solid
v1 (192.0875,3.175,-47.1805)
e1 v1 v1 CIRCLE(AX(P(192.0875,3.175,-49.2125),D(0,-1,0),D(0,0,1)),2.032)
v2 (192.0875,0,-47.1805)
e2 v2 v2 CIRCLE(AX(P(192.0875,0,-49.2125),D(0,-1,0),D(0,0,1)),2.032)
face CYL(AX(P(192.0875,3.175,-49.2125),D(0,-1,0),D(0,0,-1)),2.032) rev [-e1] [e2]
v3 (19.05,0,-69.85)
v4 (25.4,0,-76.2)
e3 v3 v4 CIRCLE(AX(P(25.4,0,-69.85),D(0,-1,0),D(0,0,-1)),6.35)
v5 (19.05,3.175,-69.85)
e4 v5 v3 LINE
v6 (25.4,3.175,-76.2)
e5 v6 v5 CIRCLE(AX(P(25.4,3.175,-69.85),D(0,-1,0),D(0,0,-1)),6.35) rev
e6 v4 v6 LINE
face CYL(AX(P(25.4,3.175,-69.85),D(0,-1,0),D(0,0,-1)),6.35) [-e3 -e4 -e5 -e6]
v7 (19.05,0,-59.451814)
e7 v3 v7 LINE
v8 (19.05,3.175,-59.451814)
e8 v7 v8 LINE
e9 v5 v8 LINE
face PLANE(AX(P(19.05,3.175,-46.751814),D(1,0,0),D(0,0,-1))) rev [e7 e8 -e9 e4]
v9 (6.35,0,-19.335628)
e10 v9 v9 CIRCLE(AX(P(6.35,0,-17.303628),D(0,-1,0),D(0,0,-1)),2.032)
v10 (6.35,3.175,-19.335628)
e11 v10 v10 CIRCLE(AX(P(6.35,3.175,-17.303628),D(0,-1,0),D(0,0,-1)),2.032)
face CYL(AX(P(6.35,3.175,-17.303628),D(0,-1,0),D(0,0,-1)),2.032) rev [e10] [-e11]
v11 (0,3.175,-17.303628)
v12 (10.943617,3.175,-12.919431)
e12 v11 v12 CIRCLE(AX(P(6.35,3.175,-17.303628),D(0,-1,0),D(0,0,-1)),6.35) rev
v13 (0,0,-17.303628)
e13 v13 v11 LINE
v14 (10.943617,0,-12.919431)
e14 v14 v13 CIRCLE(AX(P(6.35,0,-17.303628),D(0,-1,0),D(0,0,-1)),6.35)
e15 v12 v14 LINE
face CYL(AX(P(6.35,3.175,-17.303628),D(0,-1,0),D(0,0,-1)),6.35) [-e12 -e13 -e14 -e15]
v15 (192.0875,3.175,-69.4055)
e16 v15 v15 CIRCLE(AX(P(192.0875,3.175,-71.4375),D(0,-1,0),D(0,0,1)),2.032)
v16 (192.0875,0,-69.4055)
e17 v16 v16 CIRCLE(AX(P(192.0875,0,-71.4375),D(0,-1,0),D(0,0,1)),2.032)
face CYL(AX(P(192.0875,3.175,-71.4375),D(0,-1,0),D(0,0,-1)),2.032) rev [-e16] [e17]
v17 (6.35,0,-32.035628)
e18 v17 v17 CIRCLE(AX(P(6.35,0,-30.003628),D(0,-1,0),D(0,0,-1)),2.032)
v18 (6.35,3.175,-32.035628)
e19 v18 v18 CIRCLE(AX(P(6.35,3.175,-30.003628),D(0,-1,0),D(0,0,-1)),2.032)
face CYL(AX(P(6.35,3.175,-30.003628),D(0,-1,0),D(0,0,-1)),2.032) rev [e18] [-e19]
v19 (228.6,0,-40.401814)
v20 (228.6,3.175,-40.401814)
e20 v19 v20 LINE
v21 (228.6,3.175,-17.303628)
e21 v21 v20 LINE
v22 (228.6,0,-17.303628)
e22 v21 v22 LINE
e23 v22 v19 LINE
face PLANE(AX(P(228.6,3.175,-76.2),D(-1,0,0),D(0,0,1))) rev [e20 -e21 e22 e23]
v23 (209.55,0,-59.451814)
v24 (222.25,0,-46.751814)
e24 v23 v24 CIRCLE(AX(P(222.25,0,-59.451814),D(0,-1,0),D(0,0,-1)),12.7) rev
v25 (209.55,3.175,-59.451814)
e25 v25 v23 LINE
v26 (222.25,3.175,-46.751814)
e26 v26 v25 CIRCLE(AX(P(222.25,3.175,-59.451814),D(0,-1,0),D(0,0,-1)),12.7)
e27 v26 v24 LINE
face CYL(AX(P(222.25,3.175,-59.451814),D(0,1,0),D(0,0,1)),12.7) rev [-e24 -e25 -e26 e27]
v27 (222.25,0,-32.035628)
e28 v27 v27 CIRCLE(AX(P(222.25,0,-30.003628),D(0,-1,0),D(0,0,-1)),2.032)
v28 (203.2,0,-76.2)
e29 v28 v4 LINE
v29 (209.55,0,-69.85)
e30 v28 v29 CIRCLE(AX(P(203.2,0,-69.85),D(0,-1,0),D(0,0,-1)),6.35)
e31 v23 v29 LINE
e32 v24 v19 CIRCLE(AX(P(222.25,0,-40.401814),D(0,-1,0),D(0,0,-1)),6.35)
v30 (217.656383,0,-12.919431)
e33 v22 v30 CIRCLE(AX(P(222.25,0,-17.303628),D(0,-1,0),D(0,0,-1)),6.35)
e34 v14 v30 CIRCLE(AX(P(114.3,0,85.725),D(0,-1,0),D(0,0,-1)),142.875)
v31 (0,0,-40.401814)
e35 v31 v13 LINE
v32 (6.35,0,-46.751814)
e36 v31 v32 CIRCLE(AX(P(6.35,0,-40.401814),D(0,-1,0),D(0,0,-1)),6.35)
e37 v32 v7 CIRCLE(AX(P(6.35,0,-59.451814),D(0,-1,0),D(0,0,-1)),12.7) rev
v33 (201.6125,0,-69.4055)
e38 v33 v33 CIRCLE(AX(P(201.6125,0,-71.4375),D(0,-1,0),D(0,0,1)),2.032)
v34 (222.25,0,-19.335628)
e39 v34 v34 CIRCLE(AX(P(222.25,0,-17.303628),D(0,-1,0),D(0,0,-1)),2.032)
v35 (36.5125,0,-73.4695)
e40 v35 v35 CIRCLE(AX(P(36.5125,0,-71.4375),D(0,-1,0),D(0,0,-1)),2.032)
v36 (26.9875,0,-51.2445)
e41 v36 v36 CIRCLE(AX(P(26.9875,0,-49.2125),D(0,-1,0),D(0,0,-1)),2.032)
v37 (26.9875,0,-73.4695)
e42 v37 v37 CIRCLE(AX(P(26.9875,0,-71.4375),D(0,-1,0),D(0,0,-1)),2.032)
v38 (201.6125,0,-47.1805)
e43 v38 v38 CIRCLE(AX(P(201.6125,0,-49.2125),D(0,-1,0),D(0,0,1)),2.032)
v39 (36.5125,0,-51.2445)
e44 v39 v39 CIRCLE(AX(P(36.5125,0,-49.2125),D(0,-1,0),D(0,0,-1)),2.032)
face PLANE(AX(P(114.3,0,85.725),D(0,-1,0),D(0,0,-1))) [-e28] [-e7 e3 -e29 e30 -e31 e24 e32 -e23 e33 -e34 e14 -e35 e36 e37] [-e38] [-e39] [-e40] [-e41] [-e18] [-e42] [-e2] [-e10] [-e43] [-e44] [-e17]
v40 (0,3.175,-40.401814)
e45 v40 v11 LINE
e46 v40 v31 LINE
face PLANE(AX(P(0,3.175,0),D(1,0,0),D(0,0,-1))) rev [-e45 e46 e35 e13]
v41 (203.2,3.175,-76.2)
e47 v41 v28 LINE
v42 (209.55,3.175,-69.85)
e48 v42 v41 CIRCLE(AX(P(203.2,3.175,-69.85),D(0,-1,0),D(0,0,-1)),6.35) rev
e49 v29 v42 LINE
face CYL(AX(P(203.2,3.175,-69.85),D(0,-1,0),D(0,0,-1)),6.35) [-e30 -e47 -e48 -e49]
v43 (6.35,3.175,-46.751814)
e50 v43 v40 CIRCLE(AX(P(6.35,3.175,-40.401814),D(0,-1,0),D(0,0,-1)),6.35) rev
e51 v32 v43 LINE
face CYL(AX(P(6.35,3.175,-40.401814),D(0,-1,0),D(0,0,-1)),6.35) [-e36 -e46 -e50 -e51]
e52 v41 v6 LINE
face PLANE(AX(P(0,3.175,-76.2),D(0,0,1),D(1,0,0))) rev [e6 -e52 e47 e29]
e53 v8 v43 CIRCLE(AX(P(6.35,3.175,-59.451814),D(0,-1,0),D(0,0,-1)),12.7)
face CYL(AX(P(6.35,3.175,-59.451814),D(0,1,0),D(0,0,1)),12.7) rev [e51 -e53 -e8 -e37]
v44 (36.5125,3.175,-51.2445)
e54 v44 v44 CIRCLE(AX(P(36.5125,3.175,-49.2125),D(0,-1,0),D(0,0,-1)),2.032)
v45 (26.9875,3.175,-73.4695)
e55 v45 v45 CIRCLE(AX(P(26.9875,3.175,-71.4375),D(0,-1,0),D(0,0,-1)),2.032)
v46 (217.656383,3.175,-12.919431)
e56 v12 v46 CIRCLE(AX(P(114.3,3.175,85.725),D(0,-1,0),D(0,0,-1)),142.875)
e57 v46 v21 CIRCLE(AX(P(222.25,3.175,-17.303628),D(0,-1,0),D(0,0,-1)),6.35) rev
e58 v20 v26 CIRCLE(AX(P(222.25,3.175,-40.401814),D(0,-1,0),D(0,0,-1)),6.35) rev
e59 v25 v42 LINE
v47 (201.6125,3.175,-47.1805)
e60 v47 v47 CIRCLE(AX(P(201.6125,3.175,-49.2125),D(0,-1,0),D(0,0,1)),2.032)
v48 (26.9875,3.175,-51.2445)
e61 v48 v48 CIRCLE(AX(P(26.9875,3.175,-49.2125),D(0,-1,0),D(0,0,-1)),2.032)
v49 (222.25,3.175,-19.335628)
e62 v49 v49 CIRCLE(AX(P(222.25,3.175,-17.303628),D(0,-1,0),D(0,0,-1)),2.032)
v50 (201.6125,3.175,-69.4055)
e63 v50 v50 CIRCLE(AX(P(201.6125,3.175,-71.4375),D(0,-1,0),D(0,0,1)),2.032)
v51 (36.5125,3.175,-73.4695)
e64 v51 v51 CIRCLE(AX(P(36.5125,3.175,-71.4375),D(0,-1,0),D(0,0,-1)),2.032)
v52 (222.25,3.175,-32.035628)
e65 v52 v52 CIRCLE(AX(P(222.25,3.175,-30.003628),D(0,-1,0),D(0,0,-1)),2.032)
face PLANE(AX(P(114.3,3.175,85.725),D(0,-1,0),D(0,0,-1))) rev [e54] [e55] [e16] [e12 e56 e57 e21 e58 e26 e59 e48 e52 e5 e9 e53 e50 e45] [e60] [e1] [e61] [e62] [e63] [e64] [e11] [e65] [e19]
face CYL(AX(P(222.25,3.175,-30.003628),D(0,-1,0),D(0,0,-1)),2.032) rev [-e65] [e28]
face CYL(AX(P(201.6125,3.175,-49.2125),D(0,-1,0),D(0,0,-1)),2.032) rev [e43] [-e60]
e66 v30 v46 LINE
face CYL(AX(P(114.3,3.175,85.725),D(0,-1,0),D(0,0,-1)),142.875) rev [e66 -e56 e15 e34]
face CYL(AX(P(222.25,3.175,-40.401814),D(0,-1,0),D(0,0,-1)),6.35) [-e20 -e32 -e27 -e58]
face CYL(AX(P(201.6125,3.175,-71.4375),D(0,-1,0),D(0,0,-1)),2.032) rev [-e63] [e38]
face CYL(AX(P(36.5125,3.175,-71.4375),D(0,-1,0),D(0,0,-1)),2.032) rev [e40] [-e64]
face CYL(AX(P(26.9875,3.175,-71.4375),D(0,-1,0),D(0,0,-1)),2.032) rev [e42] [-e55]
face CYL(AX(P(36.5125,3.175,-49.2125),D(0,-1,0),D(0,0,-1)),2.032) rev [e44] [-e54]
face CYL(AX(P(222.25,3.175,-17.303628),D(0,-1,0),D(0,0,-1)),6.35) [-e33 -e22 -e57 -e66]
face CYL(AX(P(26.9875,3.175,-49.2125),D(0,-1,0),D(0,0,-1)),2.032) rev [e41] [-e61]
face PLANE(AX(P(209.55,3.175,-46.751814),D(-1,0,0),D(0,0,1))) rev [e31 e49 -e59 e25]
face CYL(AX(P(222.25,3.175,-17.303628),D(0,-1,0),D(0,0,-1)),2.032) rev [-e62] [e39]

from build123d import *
from OCP.BRepFilletAPI import BRepFilletAPI_MakeFillet

# Parameters (mm, degrees)
BOSS_EXTRUDE1_DEPTH = 3.175
SKETCH3_R           = 2.032
CUT_EXTRUDE1_DEPTH  = 241.986473946
FILLET1_R           = 6.35
SKETCH4_R           = 2.032
SKETCH4_W           = 19.05
SKETCH4_H           = 29.448186152
CUT_EXTRUDE2_DEPTH  = 241.986473946
FILLET2_R           = 12.7
FILLET2_R_2         = 6.35


with BuildPart() as part:
    # Sketch1 → Boss-Extrude1 (new body)
    with BuildSketch(Plane(origin=(0, 0, 0), x_dir=(1, 0, 0), z_dir=(0, 1, 0))):
        with BuildLine():
            Line((0, 0), (0, 76.2))
            Line((0, 76.2), (228.6, 76.2))
            Line((228.6, 76.2), (228.6, 0))
            ThreePointArc((228.6, 0), (114.3, 57.15), (0, 0))
        make_face()
    extrude(amount=BOSS_EXTRUDE1_DEPTH)

    # Sketch3 → Cut-Extrude1 (cut, through all)
    with BuildSketch(Plane.XZ):
        with Locations(Location((36.5125, -49.2125, 0), (0, 0, 270))):
            Circle(SKETCH3_R)
        with Locations(Location((26.9875, -49.2125, 0), (0, 0, 270))):
            Circle(SKETCH3_R)
        with Locations(Location((201.6125, -49.2125, 0), (0, 0, 90))):
            Circle(SKETCH3_R)
        with Locations(Location((192.0875, -49.2125, 0), (0, 0, 90))):
            Circle(SKETCH3_R)
        with Locations(Location((36.5125, -71.4375, 0), (0, 0, 270))):
            Circle(SKETCH3_R)
        with Locations(Location((26.9875, -71.4375, 0), (0, 0, 270))):
            Circle(SKETCH3_R)
        with Locations(Location((201.6125, -71.4375, 0), (0, 0, 90))):
            Circle(SKETCH3_R)
        with Locations(Location((192.0875, -71.4375, 0), (0, 0, 90))):
            Circle(SKETCH3_R)
    extrude(amount=-CUT_EXTRUDE1_DEPTH, mode=Mode.SUBTRACT)

    # Fillet1
    fillet1_edges = [part.edges().sort_by_distance(p)[0] for p in [
        (0, 1.5875, 0),
        (228.6, 1.5875, 0),
    ]]
    fillet(fillet1_edges, radius=FILLET1_R)

    # Sketch4 → Cut-Extrude2 (cut, through all)
    with BuildSketch(Plane.XZ):
        with Locations(Location((6.35, -17.303627696, 0), (0, 0, 270))):
            Circle(SKETCH4_R)
        with Locations(Location((6.35, -30.003627696, 0), (0, 0, 270))):
            Circle(SKETCH4_R)
        with Locations(Location((222.25, -17.303627696, 0), (0, 0, 270))):
            Circle(SKETCH4_R)
        with Locations(Location((222.25, -30.003627696, 0), (0, 0, 270))):
            Circle(SKETCH4_R)
        with Locations((9.525, -61.475906924)):
            Rectangle(SKETCH4_W, SKETCH4_H)
        with Locations((219.075, -61.475906924)):
            Rectangle(SKETCH4_W, SKETCH4_H)
    extrude(amount=-CUT_EXTRUDE2_DEPTH, mode=Mode.SUBTRACT)

    # Fillet2
    fillet2_edges_1 = [part.edges().sort_by_distance(p)[0] for p in [
        (209.55, 1.5875, -46.751813848),
        (19.05, 1.5875, -46.751813848),
    ]]
    fillet2_edges_2 = [part.edges().sort_by_distance(p)[0] for p in [
        (228.6, 1.5875, -46.751813848),
        (209.55, 1.5875, -76.2),
        (0, 1.5875, -46.751813848),
        (19.05, 1.5875, -76.2),
    ]]
    fillet2 = BRepFilletAPI_MakeFillet(part.part.solid().wrapped)
    for e in fillet2_edges_1:
        fillet2.Add(FILLET2_R - 0.0001, e.wrapped)
    for e in fillet2_edges_2:
        fillet2.Add(FILLET2_R_2 - 0.0001, e.wrapped)
    add(Compound.cast(fillet2.Shape()), mode=Mode.REPLACE)  # a hair under: the kernel refuses the full size


solid = part.part
